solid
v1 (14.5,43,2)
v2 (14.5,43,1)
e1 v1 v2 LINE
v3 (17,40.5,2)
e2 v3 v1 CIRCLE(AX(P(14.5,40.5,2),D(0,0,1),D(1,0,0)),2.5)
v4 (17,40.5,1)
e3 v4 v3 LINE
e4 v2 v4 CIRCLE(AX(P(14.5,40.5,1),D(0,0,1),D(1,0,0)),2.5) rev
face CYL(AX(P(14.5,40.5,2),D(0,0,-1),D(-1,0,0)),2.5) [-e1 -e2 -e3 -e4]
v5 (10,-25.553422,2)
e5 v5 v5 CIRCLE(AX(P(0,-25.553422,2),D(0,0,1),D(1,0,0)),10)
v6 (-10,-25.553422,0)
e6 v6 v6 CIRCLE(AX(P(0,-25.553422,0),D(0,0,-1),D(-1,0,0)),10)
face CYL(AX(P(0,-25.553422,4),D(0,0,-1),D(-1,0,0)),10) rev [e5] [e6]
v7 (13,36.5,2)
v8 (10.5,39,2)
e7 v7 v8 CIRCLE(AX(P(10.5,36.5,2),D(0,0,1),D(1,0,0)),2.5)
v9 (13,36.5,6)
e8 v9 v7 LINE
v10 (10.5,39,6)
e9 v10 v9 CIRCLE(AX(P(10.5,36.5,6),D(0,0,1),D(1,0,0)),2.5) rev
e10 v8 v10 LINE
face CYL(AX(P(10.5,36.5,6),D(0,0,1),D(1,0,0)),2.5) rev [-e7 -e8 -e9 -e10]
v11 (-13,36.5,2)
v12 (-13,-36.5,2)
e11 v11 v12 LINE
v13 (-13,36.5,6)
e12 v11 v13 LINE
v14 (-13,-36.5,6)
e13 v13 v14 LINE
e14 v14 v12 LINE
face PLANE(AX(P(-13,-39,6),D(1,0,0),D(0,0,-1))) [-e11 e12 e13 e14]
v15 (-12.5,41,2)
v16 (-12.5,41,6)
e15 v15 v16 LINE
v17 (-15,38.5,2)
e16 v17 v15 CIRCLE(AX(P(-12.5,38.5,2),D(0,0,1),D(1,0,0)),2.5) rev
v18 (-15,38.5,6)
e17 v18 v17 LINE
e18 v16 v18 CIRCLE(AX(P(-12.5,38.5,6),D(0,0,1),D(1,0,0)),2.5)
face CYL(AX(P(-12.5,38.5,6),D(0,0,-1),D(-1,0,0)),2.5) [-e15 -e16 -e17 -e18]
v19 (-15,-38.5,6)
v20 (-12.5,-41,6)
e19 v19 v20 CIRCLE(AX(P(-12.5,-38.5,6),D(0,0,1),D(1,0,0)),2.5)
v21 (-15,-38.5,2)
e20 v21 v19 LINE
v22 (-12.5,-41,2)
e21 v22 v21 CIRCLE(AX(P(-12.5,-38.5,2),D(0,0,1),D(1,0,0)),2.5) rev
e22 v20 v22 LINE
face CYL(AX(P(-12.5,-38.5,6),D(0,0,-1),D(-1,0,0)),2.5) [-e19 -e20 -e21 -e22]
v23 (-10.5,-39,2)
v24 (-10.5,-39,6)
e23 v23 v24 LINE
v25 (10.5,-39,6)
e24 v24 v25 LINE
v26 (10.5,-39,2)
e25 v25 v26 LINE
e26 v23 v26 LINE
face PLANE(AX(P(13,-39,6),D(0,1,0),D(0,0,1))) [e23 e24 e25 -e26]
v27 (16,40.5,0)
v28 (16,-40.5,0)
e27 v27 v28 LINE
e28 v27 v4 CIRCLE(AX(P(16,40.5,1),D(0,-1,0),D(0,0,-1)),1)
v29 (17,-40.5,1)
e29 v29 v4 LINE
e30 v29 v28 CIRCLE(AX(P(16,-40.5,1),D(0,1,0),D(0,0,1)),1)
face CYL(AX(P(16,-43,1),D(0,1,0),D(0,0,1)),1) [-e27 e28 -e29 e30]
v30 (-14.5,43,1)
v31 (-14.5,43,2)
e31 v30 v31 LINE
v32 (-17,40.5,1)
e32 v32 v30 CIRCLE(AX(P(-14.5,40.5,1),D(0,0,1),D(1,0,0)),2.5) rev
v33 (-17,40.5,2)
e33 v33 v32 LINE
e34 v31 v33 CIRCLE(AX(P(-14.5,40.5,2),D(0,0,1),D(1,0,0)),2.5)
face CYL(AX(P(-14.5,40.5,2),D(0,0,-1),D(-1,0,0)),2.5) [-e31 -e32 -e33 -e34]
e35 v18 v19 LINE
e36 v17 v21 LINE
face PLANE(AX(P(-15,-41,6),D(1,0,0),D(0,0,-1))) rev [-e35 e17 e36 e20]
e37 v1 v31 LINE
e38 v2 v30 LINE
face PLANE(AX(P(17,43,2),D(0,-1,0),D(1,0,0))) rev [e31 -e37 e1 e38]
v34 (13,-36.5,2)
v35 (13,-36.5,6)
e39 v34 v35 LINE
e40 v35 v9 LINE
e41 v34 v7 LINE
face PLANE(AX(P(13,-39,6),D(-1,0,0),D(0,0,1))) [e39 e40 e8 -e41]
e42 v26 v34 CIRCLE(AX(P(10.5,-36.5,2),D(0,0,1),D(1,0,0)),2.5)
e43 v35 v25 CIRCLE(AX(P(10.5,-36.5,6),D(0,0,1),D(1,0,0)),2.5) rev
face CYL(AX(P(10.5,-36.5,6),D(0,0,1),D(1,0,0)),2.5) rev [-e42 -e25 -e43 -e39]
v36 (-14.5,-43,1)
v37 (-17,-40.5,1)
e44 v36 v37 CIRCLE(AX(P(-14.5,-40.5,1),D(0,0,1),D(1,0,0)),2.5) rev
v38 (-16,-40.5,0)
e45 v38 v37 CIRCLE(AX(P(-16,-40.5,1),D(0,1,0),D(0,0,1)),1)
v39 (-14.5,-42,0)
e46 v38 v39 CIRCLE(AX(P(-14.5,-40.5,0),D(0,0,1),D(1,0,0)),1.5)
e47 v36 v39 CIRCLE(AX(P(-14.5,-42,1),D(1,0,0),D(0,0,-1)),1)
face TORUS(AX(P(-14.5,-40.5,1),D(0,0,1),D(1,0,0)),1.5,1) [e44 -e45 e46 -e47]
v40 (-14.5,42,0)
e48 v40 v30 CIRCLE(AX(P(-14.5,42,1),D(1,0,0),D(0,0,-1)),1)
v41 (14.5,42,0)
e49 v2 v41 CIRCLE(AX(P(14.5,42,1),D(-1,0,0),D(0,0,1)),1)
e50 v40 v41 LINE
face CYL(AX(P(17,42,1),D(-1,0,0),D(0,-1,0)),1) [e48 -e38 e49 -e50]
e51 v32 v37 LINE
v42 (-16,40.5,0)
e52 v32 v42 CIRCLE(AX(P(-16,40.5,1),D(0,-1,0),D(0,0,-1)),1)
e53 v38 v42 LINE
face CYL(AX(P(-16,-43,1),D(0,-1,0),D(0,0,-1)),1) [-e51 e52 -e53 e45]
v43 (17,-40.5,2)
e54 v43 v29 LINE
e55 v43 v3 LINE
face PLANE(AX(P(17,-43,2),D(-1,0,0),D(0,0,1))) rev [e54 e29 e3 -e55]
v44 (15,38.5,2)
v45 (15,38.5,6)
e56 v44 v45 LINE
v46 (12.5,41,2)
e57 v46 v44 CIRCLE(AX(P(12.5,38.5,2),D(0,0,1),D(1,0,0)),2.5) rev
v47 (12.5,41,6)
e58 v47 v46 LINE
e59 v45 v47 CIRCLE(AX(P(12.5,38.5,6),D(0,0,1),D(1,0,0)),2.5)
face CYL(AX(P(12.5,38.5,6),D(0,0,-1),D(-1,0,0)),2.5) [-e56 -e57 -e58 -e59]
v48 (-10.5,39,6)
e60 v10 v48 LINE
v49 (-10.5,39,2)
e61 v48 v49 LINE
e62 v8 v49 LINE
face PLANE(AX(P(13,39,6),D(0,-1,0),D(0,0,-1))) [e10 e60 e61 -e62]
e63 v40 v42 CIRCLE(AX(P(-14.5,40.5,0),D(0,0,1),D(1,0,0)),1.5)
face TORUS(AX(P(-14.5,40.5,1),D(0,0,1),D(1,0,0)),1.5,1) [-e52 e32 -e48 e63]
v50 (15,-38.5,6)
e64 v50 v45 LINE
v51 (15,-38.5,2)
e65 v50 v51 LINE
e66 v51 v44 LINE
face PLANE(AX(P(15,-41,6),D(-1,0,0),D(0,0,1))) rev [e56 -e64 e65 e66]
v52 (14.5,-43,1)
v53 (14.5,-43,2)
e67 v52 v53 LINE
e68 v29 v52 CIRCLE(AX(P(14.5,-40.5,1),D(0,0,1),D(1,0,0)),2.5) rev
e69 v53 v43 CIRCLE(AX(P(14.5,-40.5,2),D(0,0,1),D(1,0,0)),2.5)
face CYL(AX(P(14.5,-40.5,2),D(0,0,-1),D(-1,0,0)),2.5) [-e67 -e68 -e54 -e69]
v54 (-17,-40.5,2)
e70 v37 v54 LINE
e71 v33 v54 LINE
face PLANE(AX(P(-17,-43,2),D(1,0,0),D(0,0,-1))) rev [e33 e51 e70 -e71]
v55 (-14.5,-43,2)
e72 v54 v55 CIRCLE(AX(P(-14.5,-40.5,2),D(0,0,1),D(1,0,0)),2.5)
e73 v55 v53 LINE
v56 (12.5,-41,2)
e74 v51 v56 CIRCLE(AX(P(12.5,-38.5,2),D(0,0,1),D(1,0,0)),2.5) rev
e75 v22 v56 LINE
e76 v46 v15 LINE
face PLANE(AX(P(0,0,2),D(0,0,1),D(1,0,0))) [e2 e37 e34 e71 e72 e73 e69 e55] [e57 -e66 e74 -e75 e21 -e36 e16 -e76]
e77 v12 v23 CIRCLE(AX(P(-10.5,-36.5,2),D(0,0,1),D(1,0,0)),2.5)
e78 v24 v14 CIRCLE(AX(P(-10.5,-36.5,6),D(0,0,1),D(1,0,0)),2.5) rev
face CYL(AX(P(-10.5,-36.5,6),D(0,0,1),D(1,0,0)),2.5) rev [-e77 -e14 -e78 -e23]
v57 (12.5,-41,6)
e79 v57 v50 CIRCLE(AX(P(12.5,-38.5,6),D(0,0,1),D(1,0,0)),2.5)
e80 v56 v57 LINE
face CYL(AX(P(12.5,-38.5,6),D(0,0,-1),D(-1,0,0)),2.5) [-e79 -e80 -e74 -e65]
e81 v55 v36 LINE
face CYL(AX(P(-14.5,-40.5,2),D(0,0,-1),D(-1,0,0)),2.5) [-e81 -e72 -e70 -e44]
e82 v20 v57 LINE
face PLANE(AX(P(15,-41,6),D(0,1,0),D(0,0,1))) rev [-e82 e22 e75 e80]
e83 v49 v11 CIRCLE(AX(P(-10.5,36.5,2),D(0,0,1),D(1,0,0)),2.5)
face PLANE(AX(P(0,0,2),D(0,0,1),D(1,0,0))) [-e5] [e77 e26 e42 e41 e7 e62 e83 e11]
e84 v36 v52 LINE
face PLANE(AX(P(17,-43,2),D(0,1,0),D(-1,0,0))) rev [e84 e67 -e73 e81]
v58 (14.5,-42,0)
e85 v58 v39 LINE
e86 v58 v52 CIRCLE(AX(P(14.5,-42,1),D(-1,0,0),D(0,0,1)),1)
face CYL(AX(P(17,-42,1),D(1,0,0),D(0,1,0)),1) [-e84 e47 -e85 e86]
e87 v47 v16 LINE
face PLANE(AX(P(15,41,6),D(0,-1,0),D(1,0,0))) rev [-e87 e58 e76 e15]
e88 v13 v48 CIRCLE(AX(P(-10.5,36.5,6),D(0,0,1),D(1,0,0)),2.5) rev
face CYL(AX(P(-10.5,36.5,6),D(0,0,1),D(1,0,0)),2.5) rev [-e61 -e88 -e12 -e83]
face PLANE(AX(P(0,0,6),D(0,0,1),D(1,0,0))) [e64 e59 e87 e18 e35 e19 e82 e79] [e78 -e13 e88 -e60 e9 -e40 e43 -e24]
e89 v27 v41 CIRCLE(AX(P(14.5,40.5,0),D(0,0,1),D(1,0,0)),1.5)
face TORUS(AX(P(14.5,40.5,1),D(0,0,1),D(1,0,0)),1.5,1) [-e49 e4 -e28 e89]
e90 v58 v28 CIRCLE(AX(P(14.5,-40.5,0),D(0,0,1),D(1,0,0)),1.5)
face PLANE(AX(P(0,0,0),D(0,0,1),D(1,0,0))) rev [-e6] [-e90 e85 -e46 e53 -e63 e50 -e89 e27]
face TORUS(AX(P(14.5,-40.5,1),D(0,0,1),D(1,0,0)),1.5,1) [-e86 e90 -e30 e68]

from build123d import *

# Parameters (mm, degrees)
ESQUISSE1_W             = 34
ESQUISSE1_H             = 86
BOSS_EXTRU_1_DEPTH      = 2
ESQUISSE2_W             = 30
ESQUISSE2_H             = 82
ESQUISSE2_W_2           = 26
ESQUISSE2_H_2           = 78
BOSS_EXTRU_2_DEPTH      = 4
CONG_3_R                = 1
CONG_2_R                = 2.5
ESQUISSE3_R             = 10
ENL_V_MAT_EXTRU_1_DEPTH = 4


with BuildPart() as part:
    # Esquisse1 → Boss.-Extru.1 (new body)
    with BuildSketch(Plane.XY):
        Rectangle(ESQUISSE1_W, ESQUISSE1_H)
    extrude(amount=BOSS_EXTRU_1_DEPTH)

    # Esquisse2 → Boss.-Extru.2 (add)
    with BuildSketch(Plane.XY.offset(2)):
        Rectangle(ESQUISSE2_W, ESQUISSE2_H)
        Rectangle(ESQUISSE2_W_2, ESQUISSE2_H_2, mode=Mode.SUBTRACT)
    extrude(amount=BOSS_EXTRU_2_DEPTH)

    # Congé3
    cong_3_edges = [part.edges().sort_by_distance(p)[0] for p in [
        (0, 43, 0),
        (17, 0, 0),
        (0, -43, 0),
        (-17, 0, 0),
    ]]
    fillet(cong_3_edges, radius=CONG_3_R)

    # Congé2
    # the kernel refuses this fillet: 2.5 mm, written as the material it adds along each edge
    with BuildSketch(Plane(origin=(-13, -39, 2), x_dir=(0, 1, 0), z_dir=(0, 0, 1)), Plane(origin=(13, 39, 2), x_dir=(0, -1, 0), z_dir=(0, 0, 1)), Plane(origin=(-13, 39, 2), x_dir=(1, 0, 0), z_dir=(0, 0, 1))) as cong_2_piece_1:
        with BuildLine():
            CenterArc((CONG_2_R, -CONG_2_R), CONG_2_R, 90, 90)
            Line((0, -CONG_2_R), (-CONG_2_R * 0.02, -CONG_2_R))
            Line((-CONG_2_R * 0.02, -CONG_2_R), (-CONG_2_R * 0.02, CONG_2_R * 0.02))
            Line((-CONG_2_R * 0.02, CONG_2_R * 0.02), (CONG_2_R, CONG_2_R * 0.02))
            Line((CONG_2_R, CONG_2_R * 0.02), (CONG_2_R, 0))
        make_face()
    extrude(amount=4)
    with BuildSketch(Plane(origin=(13, -39, 2), x_dir=(0, 1, 0), z_dir=(0, 0, 1))) as cong_2_piece_2:
        with BuildLine():
            CenterArc((CONG_2_R, CONG_2_R), CONG_2_R, 180, 90)
            Line((0, CONG_2_R), (-CONG_2_R * 0.02, CONG_2_R))
            Line((-CONG_2_R * 0.02, CONG_2_R), (-CONG_2_R * 0.02, -CONG_2_R * 0.02))
            Line((-CONG_2_R * 0.02, -CONG_2_R * 0.02), (CONG_2_R, -CONG_2_R * 0.02))
            Line((CONG_2_R, -CONG_2_R * 0.02), (CONG_2_R, 0))
        make_face()
    extrude(amount=4)
    # the kernel refuses this fillet: 2.5 mm, written as the material it takes off along each edge
    with BuildSketch(Plane(origin=(14.5, 40.5, 0), x_dir=(0, 1, 0), z_dir=(-1, 0, 0))) as cong_2_2_piece_1:
        with BuildLine():
            CenterArc((1.5, -1), 1, 0, 90)
            Line((2.5, -1), (2.5, 0))
            Line((2.5, 0), (1.5, 0))
        make_face()
    revolve(axis=Axis((14.5, 40.5, 0), (0, 0, -1)), revolution_arc=90, mode=Mode.SUBTRACT)
    with BuildSketch(Plane(origin=(14.5, -40.5, 0), x_dir=(1, 0, 0), z_dir=(0, 1, 0))) as cong_2_2_piece_2:
        with BuildLine():
            CenterArc((1.5, -1), 1, 0, 90)
            Line((2.5, -1), (2.5, 0))
            Line((2.5, 0), (1.5, 0))
        make_face()
    revolve(axis=Axis((14.5, -40.5, 0), (0, 0, -1)), revolution_arc=90, mode=Mode.SUBTRACT)
    with BuildSketch(Plane(origin=(-14.5, 40.5, 0), x_dir=(-1, 0, 0), z_dir=(0, -1, 0))) as cong_2_2_piece_3:
        with BuildLine():
            CenterArc((1.5, -1), 1, 0, 90)
            Line((2.5, -1), (2.5, 0))
            Line((2.5, 0), (1.5, 0))
        make_face()
    revolve(axis=Axis((-14.5, 40.5, 0), (0, 0, -1)), revolution_arc=90, mode=Mode.SUBTRACT)
    with BuildSketch(Plane(origin=(-14.5, -40.5, 0), x_dir=(0, -1, 0), z_dir=(1, 0, 0))) as cong_2_2_piece_4:
        with BuildLine():
            CenterArc((1.5, -1), 1, 0, 90)
            Line((2.5, -1), (2.5, 0))
            Line((2.5, 0), (1.5, 0))
        make_face()
    revolve(axis=Axis((-14.5, -40.5, 0), (0, 0, -1)), revolution_arc=90, mode=Mode.SUBTRACT)
    with BuildSketch(Plane(origin=(-15, 41, 2), x_dir=(0, -1, 0), z_dir=(0, 0, 1)), Plane(origin=(-15, -41, 2), x_dir=(1, 0, 0), z_dir=(0, 0, 1)), Plane(origin=(15, 41, 2), x_dir=(-1, 0, 0), z_dir=(0, 0, 1))) as cong_2_2_piece_5:
        with BuildLine():
            CenterArc((CONG_2_R, CONG_2_R), CONG_2_R, 180, 90)
            Line((0, CONG_2_R), (-CONG_2_R * 0.02, CONG_2_R))
            Line((-CONG_2_R * 0.02, CONG_2_R), (-CONG_2_R * 0.02, -CONG_2_R * 0.02))
            Line((-CONG_2_R * 0.02, -CONG_2_R * 0.02), (CONG_2_R, -CONG_2_R * 0.02))
            Line((CONG_2_R, -CONG_2_R * 0.02), (CONG_2_R, 0))
        make_face()
    extrude(amount=4, mode=Mode.SUBTRACT)
    with BuildSketch(Plane(origin=(15, -41, 2), x_dir=(-1, 0, 0), z_dir=(0, 0, 1))) as cong_2_2_piece_6:
        with BuildLine():
            CenterArc((CONG_2_R, -CONG_2_R), CONG_2_R, 90, 90)
            Line((0, -CONG_2_R), (-CONG_2_R * 0.02, -CONG_2_R))
            Line((-CONG_2_R * 0.02, -CONG_2_R), (-CONG_2_R * 0.02, CONG_2_R * 0.02))
            Line((-CONG_2_R * 0.02, CONG_2_R * 0.02), (CONG_2_R, CONG_2_R * 0.02))
            Line((CONG_2_R, CONG_2_R * 0.02), (CONG_2_R, 0))
        make_face()
    extrude(amount=4, mode=Mode.SUBTRACT)
    with BuildSketch(Plane(origin=(-17, 43, 0), x_dir=(0, -1, 0), z_dir=(0, 0, 1)), Plane(origin=(-17, -43, 0), x_dir=(1, 0, 0), z_dir=(0, 0, 1))) as cong_2_2_piece_7:
        with BuildLine():
            CenterArc((CONG_2_R, CONG_2_R), CONG_2_R, 180, 90)
            Line((0, CONG_2_R), (-CONG_2_R * 0.02, CONG_2_R))
            Line((-CONG_2_R * 0.02, CONG_2_R), (-CONG_2_R * 0.02, -CONG_2_R * 0.02))
            Line((-CONG_2_R * 0.02, -CONG_2_R * 0.02), (CONG_2_R, -CONG_2_R * 0.02))
            Line((CONG_2_R, -CONG_2_R * 0.02), (CONG_2_R, 0))
        make_face()
    extrude(amount=2, mode=Mode.SUBTRACT)
    with BuildSketch(Plane(origin=(17, 43, 0), x_dir=(0, -1, 0), z_dir=(0, 0, 1)), Plane(origin=(17, -43, 0), x_dir=(-1, 0, 0), z_dir=(0, 0, 1))) as cong_2_2_piece_8:
        with BuildLine():
            CenterArc((CONG_2_R, -CONG_2_R), CONG_2_R, 90, 90)
            Line((0, -CONG_2_R), (-CONG_2_R * 0.02, -CONG_2_R))
            Line((-CONG_2_R * 0.02, -CONG_2_R), (-CONG_2_R * 0.02, CONG_2_R * 0.02))
            Line((-CONG_2_R * 0.02, CONG_2_R * 0.02), (CONG_2_R, CONG_2_R * 0.02))
            Line((CONG_2_R, CONG_2_R * 0.02), (CONG_2_R, 0))
        make_face()
    extrude(amount=2, mode=Mode.SUBTRACT)

    # Esquisse3 → Enlèv. mat.-Extru.1 (cut)
    with BuildSketch(Plane(origin=(0, 0, 0), x_dir=(-1, 0, 0), z_dir=(0, 0, -1))):
        with Locations((0, -25.553422343)):
            Circle(ESQUISSE3_R)
    extrude(amount=-ENL_V_MAT_EXTRU_1_DEPTH, mode=Mode.SUBTRACT)


solid = part.part
